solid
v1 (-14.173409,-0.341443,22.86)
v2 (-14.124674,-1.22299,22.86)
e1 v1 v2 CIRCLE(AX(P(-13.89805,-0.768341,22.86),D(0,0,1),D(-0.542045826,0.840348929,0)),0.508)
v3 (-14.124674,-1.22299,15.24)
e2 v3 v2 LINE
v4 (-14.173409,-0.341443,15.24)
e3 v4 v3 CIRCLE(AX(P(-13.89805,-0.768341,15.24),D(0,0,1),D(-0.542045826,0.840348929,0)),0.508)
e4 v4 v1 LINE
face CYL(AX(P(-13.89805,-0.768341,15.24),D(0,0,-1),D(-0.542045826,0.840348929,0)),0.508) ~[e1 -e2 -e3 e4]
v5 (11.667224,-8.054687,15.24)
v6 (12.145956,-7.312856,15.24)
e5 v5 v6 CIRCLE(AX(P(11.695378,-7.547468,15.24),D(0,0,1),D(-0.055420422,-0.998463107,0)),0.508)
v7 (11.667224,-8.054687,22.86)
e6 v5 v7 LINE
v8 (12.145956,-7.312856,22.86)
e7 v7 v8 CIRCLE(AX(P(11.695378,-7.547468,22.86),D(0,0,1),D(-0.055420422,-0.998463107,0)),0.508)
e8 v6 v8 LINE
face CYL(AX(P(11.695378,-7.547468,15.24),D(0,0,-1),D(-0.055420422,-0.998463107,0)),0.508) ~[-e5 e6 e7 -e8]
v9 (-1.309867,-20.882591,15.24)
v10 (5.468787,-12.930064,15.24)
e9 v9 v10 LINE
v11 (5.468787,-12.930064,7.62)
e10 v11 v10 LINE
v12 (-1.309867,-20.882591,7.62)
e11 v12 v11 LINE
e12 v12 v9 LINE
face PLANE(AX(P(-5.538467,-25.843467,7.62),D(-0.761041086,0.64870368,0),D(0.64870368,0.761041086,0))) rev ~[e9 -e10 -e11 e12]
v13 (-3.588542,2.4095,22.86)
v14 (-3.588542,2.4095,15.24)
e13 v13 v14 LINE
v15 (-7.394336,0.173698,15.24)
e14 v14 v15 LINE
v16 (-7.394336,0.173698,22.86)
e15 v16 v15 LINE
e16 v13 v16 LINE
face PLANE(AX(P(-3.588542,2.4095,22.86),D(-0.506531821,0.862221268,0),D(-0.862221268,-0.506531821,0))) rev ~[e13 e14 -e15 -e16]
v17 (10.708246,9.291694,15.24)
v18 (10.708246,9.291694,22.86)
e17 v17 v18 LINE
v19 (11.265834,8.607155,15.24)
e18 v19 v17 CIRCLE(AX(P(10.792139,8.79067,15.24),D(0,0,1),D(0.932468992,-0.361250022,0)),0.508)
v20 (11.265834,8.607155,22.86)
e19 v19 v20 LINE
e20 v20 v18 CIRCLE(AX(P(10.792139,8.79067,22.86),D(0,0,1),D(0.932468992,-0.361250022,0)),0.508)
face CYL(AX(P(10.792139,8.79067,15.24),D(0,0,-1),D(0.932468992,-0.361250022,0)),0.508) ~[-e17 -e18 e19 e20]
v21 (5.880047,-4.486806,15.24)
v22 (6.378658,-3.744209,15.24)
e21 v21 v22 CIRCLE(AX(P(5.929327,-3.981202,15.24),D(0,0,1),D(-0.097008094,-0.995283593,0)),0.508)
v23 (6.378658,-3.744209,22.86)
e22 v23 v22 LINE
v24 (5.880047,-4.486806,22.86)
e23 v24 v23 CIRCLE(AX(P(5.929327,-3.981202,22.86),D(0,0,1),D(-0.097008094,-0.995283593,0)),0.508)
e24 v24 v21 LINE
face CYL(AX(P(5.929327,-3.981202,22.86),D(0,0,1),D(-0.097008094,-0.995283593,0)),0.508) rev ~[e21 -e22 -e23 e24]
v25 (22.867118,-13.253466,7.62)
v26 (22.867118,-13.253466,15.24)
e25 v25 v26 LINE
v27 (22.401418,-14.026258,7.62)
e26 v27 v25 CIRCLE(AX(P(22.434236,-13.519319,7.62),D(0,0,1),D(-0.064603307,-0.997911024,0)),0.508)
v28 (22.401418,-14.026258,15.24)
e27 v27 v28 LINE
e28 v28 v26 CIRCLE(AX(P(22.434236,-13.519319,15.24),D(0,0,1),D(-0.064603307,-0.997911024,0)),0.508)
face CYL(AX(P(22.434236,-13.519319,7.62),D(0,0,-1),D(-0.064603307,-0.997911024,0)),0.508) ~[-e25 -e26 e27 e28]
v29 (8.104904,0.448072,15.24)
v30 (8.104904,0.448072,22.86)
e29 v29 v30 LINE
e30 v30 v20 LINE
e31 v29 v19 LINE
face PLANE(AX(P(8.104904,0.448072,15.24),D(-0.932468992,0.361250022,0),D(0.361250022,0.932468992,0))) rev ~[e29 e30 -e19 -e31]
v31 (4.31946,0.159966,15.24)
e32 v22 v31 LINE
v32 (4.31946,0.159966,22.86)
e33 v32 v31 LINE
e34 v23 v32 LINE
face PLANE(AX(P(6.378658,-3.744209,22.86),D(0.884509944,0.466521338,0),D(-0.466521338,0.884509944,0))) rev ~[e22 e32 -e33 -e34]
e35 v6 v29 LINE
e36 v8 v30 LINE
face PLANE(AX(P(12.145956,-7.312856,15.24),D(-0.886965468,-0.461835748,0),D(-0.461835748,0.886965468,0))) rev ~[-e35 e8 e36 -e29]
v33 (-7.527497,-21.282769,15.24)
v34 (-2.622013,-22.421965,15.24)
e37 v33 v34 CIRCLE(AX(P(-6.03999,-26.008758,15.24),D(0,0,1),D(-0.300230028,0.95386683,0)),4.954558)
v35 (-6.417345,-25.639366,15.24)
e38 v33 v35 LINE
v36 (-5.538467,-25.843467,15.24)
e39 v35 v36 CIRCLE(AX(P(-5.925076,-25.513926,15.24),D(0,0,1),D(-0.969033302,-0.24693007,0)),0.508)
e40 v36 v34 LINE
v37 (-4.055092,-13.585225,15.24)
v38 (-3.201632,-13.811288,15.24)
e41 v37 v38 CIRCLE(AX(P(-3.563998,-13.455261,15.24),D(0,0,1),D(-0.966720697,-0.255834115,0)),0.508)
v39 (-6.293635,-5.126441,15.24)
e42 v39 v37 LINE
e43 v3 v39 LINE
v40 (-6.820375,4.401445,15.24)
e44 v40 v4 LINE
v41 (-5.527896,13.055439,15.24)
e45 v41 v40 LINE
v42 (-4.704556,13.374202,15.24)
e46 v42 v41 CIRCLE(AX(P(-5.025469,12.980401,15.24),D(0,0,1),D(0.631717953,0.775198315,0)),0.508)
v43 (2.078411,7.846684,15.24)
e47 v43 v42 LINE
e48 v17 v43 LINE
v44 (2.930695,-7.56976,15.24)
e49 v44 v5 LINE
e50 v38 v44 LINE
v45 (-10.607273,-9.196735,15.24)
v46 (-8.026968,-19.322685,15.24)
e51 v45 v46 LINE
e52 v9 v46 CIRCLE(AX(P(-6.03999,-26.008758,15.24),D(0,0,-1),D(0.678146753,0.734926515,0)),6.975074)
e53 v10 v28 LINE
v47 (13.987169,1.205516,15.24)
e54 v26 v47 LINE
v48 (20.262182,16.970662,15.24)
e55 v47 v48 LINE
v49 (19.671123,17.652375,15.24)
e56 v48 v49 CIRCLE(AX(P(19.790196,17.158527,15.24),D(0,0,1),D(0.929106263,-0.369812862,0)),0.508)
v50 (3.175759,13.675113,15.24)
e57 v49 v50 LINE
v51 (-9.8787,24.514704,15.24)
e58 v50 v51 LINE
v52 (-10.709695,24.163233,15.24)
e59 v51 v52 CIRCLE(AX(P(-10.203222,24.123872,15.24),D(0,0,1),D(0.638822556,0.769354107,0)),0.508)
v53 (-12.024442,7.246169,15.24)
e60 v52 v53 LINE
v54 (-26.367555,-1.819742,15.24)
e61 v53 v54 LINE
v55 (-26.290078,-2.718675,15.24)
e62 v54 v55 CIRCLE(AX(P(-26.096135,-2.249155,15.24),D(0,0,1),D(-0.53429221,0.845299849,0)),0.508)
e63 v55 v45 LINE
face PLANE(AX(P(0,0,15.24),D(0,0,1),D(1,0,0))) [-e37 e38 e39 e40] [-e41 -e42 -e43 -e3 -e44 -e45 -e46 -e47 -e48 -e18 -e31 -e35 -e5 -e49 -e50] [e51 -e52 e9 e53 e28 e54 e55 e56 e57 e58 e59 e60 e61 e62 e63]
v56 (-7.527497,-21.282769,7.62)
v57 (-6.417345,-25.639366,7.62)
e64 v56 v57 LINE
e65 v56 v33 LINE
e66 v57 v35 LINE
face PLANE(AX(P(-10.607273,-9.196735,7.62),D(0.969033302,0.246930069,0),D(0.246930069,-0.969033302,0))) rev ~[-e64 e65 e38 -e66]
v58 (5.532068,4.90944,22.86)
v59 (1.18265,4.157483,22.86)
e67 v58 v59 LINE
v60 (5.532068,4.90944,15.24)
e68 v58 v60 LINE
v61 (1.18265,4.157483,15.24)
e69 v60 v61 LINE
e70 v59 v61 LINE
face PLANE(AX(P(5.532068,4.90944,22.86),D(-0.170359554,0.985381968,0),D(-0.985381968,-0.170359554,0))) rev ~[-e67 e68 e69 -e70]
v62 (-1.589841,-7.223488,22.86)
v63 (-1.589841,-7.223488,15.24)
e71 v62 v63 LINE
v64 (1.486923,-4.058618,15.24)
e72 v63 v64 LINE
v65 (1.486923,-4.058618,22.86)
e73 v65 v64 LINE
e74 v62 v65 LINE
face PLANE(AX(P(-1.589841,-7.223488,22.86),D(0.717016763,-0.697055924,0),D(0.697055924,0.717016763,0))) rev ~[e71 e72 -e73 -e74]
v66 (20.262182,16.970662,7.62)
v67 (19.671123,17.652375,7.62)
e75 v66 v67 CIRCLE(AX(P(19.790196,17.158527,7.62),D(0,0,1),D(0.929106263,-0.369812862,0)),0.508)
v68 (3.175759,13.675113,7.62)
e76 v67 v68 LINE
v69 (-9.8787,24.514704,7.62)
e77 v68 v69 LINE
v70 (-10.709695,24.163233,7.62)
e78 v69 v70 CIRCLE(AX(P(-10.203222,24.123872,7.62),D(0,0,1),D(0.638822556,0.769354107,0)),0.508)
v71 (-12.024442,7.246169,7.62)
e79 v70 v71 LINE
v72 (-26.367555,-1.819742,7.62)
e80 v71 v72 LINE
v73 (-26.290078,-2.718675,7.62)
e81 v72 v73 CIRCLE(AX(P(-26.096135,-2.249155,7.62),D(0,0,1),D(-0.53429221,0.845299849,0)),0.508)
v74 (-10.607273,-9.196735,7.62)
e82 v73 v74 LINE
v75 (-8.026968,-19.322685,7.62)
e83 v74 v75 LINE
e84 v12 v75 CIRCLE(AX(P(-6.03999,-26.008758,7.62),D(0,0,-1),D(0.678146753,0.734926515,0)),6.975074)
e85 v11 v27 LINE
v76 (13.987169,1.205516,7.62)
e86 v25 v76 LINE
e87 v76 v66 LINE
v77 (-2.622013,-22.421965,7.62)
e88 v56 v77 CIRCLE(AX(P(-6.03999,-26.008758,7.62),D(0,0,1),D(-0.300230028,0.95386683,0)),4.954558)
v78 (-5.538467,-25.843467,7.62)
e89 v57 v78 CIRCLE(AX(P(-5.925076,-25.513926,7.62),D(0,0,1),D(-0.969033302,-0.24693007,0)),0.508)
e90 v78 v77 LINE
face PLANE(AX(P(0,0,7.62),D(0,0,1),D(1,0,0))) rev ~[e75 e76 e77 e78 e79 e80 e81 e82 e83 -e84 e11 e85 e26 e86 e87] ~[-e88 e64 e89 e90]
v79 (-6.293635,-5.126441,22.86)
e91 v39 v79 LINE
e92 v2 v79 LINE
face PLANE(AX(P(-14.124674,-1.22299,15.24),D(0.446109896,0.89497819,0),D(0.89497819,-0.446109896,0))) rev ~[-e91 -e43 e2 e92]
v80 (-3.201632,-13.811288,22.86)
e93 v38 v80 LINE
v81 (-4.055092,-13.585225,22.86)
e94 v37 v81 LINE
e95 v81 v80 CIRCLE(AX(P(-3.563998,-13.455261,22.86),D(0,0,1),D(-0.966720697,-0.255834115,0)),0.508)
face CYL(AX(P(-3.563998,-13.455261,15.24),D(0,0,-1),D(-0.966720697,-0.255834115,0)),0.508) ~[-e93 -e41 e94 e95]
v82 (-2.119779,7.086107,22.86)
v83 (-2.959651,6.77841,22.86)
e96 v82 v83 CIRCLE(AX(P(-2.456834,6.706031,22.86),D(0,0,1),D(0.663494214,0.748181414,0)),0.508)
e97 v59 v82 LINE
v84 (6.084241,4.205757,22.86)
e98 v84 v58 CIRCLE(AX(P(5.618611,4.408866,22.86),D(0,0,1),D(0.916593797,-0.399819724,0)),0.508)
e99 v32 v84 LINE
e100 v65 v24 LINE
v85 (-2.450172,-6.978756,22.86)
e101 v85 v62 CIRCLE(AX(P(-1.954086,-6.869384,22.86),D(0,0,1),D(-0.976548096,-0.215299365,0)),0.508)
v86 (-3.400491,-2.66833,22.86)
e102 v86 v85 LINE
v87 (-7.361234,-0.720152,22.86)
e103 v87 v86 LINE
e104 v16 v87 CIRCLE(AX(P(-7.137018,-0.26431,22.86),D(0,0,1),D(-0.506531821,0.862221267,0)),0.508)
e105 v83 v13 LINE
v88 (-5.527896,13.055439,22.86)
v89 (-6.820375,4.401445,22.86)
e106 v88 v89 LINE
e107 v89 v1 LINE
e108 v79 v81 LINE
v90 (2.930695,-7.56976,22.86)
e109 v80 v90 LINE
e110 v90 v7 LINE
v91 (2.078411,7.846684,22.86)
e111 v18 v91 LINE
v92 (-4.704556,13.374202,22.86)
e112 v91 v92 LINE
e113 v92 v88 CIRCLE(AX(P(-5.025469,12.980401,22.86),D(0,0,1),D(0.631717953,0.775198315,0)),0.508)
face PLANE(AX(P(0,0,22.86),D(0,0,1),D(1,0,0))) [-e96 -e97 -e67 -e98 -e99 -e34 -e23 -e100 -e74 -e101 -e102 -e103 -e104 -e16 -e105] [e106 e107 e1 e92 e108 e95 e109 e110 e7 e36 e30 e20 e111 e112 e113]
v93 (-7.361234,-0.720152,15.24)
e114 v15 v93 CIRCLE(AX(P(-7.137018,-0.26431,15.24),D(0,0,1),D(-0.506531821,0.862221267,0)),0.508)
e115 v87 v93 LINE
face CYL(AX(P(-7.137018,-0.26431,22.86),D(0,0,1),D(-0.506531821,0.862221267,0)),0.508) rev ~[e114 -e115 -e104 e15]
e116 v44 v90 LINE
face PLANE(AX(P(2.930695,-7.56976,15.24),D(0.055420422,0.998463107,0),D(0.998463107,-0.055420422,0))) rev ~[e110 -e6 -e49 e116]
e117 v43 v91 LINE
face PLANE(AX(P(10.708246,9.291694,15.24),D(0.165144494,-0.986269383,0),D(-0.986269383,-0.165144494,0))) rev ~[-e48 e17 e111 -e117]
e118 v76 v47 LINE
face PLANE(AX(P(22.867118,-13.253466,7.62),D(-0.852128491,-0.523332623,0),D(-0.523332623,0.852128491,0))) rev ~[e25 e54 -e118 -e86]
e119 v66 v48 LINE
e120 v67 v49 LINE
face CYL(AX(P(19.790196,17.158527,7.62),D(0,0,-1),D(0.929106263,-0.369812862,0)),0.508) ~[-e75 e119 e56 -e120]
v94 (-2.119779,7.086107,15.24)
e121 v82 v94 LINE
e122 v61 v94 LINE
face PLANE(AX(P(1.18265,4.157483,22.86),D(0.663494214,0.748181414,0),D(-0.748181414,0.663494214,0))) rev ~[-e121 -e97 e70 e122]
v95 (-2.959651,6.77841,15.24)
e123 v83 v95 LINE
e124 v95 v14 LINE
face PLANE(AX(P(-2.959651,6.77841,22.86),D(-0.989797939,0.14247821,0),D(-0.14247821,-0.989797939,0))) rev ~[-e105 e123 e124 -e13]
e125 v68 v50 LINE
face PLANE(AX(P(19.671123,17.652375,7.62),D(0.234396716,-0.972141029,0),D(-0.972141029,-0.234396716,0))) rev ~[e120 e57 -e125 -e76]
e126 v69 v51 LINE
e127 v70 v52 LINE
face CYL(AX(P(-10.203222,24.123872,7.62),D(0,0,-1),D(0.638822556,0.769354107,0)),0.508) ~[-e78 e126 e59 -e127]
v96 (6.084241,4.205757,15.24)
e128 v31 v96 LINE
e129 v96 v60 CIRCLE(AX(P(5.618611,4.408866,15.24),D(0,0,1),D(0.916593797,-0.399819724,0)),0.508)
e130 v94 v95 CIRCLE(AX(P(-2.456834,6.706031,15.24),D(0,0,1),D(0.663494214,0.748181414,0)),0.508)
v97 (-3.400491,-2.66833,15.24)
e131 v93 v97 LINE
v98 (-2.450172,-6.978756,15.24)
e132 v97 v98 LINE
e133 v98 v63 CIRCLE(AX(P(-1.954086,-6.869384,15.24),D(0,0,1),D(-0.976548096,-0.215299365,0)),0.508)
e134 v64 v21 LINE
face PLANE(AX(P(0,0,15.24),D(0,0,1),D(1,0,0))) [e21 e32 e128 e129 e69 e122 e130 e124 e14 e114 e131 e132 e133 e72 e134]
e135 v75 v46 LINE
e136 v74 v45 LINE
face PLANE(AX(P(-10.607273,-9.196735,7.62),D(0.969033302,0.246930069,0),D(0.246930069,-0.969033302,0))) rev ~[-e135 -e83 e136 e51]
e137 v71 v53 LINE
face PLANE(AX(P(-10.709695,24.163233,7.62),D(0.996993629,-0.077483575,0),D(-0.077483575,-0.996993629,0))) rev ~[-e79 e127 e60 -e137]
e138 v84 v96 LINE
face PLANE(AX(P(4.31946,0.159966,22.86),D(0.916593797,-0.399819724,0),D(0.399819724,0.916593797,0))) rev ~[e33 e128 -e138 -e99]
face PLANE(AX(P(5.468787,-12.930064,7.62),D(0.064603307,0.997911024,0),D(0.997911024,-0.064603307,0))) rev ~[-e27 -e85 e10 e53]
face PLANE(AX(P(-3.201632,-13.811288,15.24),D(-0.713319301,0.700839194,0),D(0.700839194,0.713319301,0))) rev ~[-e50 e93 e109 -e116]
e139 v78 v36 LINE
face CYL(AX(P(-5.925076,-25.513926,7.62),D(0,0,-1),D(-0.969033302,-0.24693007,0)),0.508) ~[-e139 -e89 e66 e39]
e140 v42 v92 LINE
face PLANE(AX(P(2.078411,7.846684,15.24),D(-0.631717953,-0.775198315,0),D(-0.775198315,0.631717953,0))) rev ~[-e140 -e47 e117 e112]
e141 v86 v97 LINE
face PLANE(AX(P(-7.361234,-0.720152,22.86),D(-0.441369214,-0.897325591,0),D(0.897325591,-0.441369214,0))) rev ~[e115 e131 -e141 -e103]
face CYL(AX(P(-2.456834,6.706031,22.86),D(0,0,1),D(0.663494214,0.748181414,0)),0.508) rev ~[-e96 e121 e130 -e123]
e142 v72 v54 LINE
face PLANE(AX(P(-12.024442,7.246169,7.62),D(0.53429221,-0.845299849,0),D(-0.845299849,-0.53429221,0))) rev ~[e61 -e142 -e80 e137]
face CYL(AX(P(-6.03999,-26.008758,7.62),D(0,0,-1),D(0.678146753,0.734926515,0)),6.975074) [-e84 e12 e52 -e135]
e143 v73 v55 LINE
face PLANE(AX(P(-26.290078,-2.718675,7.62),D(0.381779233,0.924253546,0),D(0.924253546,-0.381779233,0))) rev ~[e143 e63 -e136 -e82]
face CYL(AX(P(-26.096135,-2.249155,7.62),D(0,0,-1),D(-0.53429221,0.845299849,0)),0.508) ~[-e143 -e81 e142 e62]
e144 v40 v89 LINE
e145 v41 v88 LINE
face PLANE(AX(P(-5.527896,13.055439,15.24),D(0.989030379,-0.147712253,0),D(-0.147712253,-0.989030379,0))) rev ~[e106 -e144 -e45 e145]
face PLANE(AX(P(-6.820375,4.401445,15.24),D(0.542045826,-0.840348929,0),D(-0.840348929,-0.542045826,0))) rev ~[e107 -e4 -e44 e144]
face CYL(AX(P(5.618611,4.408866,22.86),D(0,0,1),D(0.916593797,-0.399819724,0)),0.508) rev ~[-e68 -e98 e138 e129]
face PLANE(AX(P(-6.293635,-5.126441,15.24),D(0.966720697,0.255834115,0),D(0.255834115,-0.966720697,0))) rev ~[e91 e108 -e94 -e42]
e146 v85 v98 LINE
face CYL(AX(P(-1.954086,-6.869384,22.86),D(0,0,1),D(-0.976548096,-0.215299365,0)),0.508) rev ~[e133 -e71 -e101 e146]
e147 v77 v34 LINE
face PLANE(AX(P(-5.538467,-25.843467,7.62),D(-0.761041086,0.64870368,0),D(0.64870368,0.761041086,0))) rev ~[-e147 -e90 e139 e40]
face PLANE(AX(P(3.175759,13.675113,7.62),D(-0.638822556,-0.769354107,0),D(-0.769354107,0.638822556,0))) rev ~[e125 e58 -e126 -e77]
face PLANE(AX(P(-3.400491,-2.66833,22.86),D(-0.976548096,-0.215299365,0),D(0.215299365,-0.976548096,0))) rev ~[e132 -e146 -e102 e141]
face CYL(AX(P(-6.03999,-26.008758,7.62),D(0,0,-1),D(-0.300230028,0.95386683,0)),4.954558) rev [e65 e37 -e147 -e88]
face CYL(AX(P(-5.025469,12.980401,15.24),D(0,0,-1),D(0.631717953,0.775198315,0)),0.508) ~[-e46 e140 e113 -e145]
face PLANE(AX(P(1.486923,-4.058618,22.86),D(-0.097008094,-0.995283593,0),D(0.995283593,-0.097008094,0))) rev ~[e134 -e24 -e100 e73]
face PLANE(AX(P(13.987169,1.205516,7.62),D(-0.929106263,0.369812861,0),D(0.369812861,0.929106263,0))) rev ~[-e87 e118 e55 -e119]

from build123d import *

# Parameters (mm, degrees)
F1_DEPTH  = 7.62
F3_DEPTH  = 7.62
F5_DEPTH  = 7.62
F8_DEPTH  = 7.62
F10_DEPTH = 7.62
F12_DEPTH = 7.62


# Not quite as in the source:
# - a feature names something its author has since deleted; it is built from what else it names


with BuildPart() as f1:
    # F0 (on Top) → F1 (new body)
    with BuildSketch(Plane.XY):
        with BuildLine():
            Line((5.2457718421, 22.65034753), (-16.6286527122, 42.176813326))
            ThreePointArc((-16.6286527122, 42.176813326), (-17.1554325452, 42.2695789476), (-17.4732486395, 41.8393518177))
            Line((-17.4732486395, 41.8393518177), (-19.9207279669, 11.9883678087))
            Line((-19.9207279669, 11.9883678087), (-45.2510694319, -2.7814364328))
            ThreePointArc((-45.2510694319, -2.7814364328), (-45.5020787015, -3.2537676721), (-45.1911189603, -3.6889762341))
            Line((-45.1911189603, -3.6889762341), (-17.5574588063, -15.2411287545))
            Line((-17.5574588063, -15.2411287545), (-11.338046224, -43.895835579))
            ThreePointArc((-11.338046224, -43.895835579), (-10.9663986511, -44.2805179605), (-10.4563988677, -44.1192645141))
            Line((-10.4563988677, -44.1192645141), (9.0696216685, -21.4079034059))
            Line((9.0696216685, -21.4079034059), (38.2437714994, -24.3476819196))
            ThreePointArc((38.2437714994, -24.3476819196), (38.724471601, -24.1130974669), (38.7287090602, -23.5782287943))
            Line((38.7287090602, -23.5782287943), (23.1627932625, 2.0103168218))
            Line((23.1627932625, 2.0103168218), (34.9739968686, 28.8481406054))
            ThreePointArc((34.9739968686, 28.8481406054), (34.8994382969, 29.3778041519), (34.3920574073, 29.5471177247))
            Line((34.3920574073, 29.5471177247), (5.2457718421, 22.65034753))
        make_face()
    extrude(amount=F1_DEPTH)

    # F2 (on face) → F3 (join)
    with BuildSketch(Plane.XY.offset(7.62)):
        with BuildLine():
            Line((-10.7096949682, 24.1632334685), (-12.0244422161, 7.2461689852))
            Line((-12.0244422161, 7.2461689852), (-26.367554987, -1.8197422817))
            ThreePointArc((-26.367554987, -1.8197422817), (-26.6022582168, -2.2927760227), (-26.2900783947, -2.7186754062))
            Line((-26.2900783947, -2.7186754062), (-10.6072732242, -9.1967347639))
            Line((-10.6072732242, -9.1967347639), (-6.4173448361, -25.6393662796))
            ThreePointArc((-6.4173448361, -25.6393662796), (-6.0399903009, -26.0087577805), (-5.5384670466, -25.8434672739))
            Line((-5.5384670466, -25.8434672739), (5.4687868356, -12.9300636548))
            Line((5.4687868356, -12.9300636548), (22.4014177608, -14.026257529))
            ThreePointArc((22.4014177608, -14.026257529), (22.8693389191, -13.7815202908), (22.8671175143, -13.2534657562))
            Line((22.8671175143, -13.2534657562), (13.9871693659, 1.2055159485))
            Line((13.9871693659, 1.2055159485), (20.2621824084, 16.9706623917))
            ThreePointArc((20.2621824084, 16.9706623917), (20.1740190532, 17.4913098242), (19.6711228952, 17.6523749678))
            Line((19.6711228952, 17.6523749678), (3.1757592389, 13.675113485))
            Line((3.1757592389, 13.675113485), (-9.8787003461, 24.5147036987))
            ThreePointArc((-9.8787003461, 24.5147036987), (-10.4011094545, 24.5917442699), (-10.7096949682, 24.1632334685))
        make_face()
    extrude(amount=F3_DEPTH)

    # F4 (on face) → F5 (join)
    with BuildSketch(Plane.XY.offset(15.24)):
        with BuildLine():
            ThreePointArc((-4.7045563215, 13.3742015157), (-5.2088793669, 13.454135563), (-5.5278964741, 13.0554385961))
            Line((-5.5278964741, 13.0554385961), (-6.8203753298, 4.4014452639))
            Line((-6.8203753298, 4.4014452639), (-14.1734093561, -0.3414433913))
            ThreePointArc((-14.1734093561, -0.3414433913), (-14.4052755444, -0.7963821309), (-14.1246739036, -1.2229895678))
            Line((-14.1246739036, -1.2229895678), (-6.2936350842, -5.1264410146))
            Line((-6.2936350842, -5.1264410146), (-4.0550923971, -13.5852251368))
            ThreePointArc((-4.0550923971, -13.5852251368), (-3.6940705368, -13.946326788), (-3.2016320784, -13.811287717))
            Line((-3.2016320784, -13.811287717), (2.9306949349, -7.5697600522))
            Line((2.9306949349, -7.5697600522), (11.6672244272, -8.0546874881))
            ThreePointArc((11.6672244272, -8.0546874881), (12.1222143958, -7.8229218423), (12.1459564597, -7.3128556696))
            Line((12.1459564597, -7.3128556696), (8.1049041646, 0.4480720157))
            Line((8.1049041646, 0.4480720157), (11.2658336475, 8.6071545004))
            ThreePointArc((11.2658336475, 8.6071545004), (11.1860110523, 9.1114951981), (10.7082459963, 9.2916943583))
            Line((10.7082459963, 9.2916943583), (2.0784113144, 7.8466837873))
            Line((2.0784113144, 7.8466837873), (-4.7045563215, 13.3742015157))
        make_face()
    extrude(amount=F5_DEPTH)

    # F8 (cut): a face of the model
    f8_faces = [f1.faces().sort_by_distance(p)[0] for p in [
        (0, 0, 0),
    ]]
    extrude(f8_faces, amount=-F8_DEPTH, mode=Mode.SUBTRACT)

    # F9 (on face) → F10 (cut)
    with BuildSketch(Plane.XY.offset(22.86)):
        with BuildLine():
            ThreePointArc((-2.1197789922, 7.0861071574), (-2.6315872512, 7.1830271414), (-2.9596514058, 6.77840993))
            Line((-2.9596514058, 6.77840993), (-3.5885418896, 2.4094997361))
            Line((-3.5885418896, 2.4094997361), (-7.3943361202, 0.173697912))
            ThreePointArc((-7.3943361202, 0.173697912), (-7.6446699524, -0.2831107457), (-7.3612335158, -0.7201518922))
            Line((-7.3612335158, -0.7201518922), (-3.400490854, -2.6683297817))
            Line((-3.400490854, -2.6683297817), (-2.4501720543, -6.9787559441))
            ThreePointArc((-2.4501720543, -6.9787559441), (-2.0930786121, -7.3579992049), (-1.5898411061, -7.2234882764))
            Line((-1.5898411061, -7.2234882764), (1.4869229634, -4.0586182344))
            Line((1.4869229634, -4.0586182344), (5.8800465123, -4.4868062846))
            ThreePointArc((5.8800465123, -4.4868062846), (6.351076229, -4.2643828521), (6.3786576755, -3.7442093799))
            Line((6.3786576755, -3.7442093799), (4.319459784, 0.1599657655))
            Line((4.319459784, 0.1599657655), (6.0842406543, 4.2057571592))
            ThreePointArc((6.0842406543, 4.2057571592), (6.0182595868, 4.7224656612), (5.5320683522, 4.9094396186))
            Line((5.5320683522, 4.9094396186), (1.1826499962, 4.1574825145))
            Line((1.1826499962, 4.1574825145), (-2.1197789922, 7.0861071574))
        make_face()
    extrude(amount=-F10_DEPTH, mode=Mode.SUBTRACT)

    # F11 (on face) → F12 (join)
    with BuildSketch(Plane(origin=(0, 0, 7.62), x_dir=(1, 0, 0), z_dir=(0, 0, -1))):
        with BuildLine():
            Line((-2.6220134118, 22.4219651148), (-1.3098667841, 20.8825912445))
            ThreePointArc((-1.3098667841, 20.8825912445), (-7.6178176155, 32.8030283673), (-8.0269681328, 19.3226848722))
            Line((-8.0269681328, 19.3226848722), (-7.5274974689, 21.282768988))
            ThreePointArc((-7.5274974689, 21.282768988), (-7.1607580244, 30.8348874257), (-2.6220134118, 22.4219651148))
        make_face()
    extrude(amount=-F12_DEPTH)


solid = f1.part
